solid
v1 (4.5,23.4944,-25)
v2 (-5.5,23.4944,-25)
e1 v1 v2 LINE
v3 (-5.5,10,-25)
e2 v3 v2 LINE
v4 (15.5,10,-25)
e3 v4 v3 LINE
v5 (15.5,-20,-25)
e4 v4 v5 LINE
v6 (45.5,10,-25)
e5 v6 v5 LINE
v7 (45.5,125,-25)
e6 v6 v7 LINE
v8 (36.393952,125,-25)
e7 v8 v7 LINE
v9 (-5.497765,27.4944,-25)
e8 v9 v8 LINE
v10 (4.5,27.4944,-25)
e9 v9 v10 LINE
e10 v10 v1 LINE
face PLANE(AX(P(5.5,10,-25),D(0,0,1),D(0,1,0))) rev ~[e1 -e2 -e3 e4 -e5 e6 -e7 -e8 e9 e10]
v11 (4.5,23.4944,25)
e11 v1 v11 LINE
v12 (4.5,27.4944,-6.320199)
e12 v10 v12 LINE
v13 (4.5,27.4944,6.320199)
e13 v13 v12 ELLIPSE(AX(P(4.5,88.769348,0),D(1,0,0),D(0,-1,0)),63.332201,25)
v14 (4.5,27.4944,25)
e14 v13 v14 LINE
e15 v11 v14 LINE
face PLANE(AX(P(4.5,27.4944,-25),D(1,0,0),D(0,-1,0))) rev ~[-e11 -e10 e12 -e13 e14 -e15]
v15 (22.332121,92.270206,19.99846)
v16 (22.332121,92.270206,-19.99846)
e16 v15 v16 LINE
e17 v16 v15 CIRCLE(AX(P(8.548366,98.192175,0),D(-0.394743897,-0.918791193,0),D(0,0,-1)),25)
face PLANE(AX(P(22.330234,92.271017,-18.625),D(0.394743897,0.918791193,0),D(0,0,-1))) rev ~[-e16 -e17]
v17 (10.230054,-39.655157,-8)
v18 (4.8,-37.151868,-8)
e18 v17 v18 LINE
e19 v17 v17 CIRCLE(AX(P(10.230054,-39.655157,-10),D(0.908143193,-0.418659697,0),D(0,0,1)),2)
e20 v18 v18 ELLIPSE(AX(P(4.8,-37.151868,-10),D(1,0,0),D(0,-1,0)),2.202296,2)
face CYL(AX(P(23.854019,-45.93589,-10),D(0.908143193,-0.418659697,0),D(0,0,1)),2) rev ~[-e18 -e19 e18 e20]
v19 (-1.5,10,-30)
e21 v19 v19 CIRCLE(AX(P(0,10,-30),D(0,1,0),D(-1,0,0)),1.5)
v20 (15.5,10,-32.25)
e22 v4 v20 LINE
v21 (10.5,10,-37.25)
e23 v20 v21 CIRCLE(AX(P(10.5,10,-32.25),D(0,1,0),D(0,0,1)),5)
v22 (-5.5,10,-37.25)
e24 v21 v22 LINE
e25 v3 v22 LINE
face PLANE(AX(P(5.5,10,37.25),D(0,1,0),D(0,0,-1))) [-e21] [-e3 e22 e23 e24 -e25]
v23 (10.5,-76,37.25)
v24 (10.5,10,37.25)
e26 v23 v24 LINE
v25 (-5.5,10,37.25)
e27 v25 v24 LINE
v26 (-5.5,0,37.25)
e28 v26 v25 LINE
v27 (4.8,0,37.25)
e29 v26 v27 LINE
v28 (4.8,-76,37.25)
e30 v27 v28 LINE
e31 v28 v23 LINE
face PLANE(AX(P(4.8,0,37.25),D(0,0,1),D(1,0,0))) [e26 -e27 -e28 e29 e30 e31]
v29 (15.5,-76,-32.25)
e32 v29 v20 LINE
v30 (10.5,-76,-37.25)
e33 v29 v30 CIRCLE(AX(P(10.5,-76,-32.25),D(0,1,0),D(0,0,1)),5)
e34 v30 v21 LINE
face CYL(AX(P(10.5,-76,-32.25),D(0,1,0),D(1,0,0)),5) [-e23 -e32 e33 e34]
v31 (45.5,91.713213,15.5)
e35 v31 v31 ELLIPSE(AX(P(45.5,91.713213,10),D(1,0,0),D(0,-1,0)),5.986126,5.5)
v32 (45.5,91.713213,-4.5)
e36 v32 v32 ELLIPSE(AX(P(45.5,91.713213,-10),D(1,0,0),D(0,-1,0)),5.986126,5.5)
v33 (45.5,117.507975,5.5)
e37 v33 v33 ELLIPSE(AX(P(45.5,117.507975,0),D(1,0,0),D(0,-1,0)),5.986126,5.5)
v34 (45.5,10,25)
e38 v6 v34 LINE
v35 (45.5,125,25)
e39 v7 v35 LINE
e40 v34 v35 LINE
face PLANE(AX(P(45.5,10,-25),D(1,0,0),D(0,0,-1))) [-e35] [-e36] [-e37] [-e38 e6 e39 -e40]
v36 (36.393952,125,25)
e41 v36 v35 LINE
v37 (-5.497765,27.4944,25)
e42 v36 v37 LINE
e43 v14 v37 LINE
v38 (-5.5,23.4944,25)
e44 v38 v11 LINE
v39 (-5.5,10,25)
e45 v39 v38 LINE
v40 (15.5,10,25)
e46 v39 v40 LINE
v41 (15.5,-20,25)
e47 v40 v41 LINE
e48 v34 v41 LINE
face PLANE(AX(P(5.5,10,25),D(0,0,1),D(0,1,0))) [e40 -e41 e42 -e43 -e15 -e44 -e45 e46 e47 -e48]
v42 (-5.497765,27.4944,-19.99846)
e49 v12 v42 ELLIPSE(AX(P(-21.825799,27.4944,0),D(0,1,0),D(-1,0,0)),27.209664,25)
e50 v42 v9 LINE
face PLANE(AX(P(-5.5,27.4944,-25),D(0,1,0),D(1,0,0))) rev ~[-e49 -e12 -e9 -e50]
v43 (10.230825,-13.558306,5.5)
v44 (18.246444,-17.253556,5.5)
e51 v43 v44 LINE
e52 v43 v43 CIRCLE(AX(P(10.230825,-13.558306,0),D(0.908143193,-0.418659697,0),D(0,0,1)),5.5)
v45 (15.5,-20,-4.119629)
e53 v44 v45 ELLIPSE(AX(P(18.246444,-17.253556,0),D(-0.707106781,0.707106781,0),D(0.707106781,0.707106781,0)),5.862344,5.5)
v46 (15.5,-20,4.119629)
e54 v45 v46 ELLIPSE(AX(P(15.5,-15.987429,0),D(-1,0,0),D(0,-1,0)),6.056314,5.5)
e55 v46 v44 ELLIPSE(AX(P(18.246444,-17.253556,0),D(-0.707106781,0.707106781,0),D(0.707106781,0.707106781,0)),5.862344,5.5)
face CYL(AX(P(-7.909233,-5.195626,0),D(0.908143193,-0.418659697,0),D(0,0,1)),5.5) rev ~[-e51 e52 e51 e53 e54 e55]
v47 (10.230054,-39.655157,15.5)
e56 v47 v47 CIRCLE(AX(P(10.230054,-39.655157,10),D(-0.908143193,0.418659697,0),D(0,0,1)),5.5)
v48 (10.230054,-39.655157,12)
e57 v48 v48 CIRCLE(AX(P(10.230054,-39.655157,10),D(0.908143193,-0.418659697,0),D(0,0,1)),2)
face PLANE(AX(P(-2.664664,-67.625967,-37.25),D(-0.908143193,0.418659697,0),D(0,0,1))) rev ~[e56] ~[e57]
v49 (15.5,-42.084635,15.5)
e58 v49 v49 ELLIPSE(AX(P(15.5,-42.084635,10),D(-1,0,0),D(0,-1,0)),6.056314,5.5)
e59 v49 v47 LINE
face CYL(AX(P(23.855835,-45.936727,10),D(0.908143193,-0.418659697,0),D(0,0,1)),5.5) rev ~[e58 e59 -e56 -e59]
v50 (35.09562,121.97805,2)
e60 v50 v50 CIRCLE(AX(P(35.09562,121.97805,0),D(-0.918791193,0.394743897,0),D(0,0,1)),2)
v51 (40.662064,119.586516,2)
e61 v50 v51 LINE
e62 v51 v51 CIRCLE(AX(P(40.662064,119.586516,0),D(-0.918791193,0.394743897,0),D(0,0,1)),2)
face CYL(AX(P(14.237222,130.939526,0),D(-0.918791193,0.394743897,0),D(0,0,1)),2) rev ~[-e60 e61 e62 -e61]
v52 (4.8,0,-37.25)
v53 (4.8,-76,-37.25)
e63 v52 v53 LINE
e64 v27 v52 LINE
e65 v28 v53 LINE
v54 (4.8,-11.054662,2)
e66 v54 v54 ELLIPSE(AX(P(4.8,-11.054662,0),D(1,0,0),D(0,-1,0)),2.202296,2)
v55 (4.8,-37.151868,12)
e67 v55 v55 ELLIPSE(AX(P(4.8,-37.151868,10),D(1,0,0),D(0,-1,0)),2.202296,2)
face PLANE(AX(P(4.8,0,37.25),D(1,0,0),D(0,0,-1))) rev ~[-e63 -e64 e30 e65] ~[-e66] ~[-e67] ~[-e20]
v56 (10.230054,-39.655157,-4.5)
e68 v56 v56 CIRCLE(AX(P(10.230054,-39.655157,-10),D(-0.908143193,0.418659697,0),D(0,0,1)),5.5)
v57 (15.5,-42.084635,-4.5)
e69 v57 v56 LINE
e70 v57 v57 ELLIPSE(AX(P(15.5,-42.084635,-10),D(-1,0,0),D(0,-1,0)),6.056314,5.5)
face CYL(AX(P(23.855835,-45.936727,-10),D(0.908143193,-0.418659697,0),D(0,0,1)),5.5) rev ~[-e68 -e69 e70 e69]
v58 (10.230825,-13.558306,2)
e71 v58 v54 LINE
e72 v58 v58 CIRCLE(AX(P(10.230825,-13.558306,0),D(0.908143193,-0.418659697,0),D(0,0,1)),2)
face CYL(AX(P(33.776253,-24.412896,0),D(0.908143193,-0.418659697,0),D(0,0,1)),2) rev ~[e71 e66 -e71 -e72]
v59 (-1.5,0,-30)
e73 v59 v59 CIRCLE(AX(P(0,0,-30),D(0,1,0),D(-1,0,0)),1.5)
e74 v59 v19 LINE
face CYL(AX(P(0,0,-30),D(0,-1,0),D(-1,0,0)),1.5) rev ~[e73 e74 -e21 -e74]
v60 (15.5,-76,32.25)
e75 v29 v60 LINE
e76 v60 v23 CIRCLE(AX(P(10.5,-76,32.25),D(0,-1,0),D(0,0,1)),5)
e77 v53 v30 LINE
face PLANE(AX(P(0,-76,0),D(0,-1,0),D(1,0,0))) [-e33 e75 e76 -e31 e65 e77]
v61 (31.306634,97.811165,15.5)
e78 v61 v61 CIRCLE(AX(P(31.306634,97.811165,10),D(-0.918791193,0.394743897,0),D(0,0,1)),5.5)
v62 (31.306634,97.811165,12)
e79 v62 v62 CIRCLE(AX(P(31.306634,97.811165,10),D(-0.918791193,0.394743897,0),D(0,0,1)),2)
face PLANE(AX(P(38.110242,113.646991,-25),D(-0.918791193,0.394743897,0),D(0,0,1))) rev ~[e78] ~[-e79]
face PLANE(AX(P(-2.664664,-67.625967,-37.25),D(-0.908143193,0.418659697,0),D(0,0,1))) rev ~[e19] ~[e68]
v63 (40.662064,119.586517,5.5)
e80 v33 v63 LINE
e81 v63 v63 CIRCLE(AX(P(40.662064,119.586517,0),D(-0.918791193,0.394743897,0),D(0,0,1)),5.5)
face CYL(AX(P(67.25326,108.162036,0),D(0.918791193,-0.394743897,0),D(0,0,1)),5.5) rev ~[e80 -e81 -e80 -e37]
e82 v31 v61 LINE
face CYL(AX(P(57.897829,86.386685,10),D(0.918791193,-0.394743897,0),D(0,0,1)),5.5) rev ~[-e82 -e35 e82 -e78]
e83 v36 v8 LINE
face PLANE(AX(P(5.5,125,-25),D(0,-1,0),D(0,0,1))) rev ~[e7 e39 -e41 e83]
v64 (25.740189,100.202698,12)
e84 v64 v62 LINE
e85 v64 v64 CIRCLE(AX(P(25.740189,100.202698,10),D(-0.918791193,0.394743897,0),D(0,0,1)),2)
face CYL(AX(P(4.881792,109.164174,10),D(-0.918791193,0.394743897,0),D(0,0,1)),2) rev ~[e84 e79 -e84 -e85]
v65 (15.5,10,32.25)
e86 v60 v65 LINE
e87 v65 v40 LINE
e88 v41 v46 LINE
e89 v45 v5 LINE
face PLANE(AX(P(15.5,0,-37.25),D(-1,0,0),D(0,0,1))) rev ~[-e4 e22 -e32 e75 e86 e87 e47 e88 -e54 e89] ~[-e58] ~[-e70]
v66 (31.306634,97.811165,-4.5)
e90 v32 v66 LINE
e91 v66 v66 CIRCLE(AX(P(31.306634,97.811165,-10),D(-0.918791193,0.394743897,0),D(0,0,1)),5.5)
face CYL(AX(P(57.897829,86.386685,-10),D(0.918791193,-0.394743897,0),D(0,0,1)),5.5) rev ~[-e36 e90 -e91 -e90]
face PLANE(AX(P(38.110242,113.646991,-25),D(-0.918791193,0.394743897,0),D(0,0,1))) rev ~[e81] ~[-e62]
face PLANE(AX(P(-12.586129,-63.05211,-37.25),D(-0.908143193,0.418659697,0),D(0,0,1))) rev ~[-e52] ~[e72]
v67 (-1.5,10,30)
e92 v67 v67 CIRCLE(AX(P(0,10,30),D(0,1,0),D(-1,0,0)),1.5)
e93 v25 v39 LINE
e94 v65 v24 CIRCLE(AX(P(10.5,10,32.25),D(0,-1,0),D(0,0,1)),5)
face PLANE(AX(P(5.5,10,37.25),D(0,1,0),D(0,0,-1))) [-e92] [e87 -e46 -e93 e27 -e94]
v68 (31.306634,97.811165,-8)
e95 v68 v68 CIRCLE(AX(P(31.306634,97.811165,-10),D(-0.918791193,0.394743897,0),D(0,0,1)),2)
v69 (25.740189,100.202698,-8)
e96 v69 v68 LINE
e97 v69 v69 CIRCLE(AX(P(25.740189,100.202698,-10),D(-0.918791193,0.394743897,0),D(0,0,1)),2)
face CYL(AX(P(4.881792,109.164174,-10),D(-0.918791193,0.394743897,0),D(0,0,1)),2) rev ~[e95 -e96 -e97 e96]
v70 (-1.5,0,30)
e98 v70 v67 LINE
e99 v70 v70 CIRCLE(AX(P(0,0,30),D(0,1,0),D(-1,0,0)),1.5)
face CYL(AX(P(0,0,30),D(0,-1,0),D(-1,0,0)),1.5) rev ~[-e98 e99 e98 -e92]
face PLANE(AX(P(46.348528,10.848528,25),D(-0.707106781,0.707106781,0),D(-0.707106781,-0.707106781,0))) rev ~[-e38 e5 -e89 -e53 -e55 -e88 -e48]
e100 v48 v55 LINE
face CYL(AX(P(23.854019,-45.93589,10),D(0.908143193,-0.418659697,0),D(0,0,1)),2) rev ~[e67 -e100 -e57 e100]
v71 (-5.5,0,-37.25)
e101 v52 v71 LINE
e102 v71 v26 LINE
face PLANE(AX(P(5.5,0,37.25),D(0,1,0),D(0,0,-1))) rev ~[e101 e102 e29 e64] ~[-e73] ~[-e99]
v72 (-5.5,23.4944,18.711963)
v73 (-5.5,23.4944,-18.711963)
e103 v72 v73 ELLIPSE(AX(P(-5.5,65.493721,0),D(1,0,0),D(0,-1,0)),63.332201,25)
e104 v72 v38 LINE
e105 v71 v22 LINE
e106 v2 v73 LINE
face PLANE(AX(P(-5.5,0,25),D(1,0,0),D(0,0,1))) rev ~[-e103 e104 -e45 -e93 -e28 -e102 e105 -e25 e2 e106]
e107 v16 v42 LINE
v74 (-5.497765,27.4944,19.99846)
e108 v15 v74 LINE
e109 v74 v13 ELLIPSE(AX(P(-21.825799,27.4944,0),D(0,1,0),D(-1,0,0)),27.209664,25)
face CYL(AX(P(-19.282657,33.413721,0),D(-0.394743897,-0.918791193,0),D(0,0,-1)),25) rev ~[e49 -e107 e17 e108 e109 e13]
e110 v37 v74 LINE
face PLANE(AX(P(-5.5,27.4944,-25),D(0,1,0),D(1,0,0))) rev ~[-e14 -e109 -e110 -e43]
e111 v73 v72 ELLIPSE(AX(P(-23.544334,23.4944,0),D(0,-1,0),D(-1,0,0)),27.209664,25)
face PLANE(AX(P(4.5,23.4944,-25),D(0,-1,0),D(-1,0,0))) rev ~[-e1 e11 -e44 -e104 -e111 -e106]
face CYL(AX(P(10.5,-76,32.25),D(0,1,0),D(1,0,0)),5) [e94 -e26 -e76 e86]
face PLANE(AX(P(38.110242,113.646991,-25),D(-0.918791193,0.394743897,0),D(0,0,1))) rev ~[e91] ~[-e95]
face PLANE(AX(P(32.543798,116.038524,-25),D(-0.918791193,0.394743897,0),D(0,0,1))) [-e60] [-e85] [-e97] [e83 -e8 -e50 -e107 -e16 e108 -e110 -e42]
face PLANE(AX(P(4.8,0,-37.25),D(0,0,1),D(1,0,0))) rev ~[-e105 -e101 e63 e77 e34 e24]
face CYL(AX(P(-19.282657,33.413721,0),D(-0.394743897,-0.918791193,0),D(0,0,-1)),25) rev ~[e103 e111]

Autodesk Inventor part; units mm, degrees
sketch "Sketch1" plane through (0, 0, 0) normal (0, 1, 0) x (-1, 0, 0)
  line L0 (5.5, 37.25) -> (-5.5, 37.25)
  line L1 (-5.5, 37.25) -> (-5.5, -37.25)
  line L2 (-5.5, -37.25) -> (5.5, -37.25)
  line L3 (5.5, -37.25) -> (5.5, 37.25)
  line L4 (5.5, 37.25) -> (-5.5, -37.25) construction
  line L5 (-5.5, 37.25) -> (5.5, -37.25) construction
  circle A0 centre (0, 30) radius 1.5
  line L6 (5.5, 0) -> (-5.5, 0)
  circle A1 centre (0, -30) radius 1.5
  line L7 (-5.5, -25) -> (5.5, -25)
  line L8 (5.5, -25) -> (5.5, 25)
  line L9 (5.5, 25) -> (-5.5, 25)
  line L10 (-5.5, 25) -> (-5.5, -25)
  line L11 (-5.5, -25) -> (5.5, 25) construction
  line L12 (5.5, -25) -> (-5.5, 25) construction
  point P0 (0, 0)
  dimension "d0" = 11
  dimension "d1" = 74.5
  dimension "d2" = 3
  dimension "d3" = 7.25
  dimension "d28" = 50
extrude "Extrusion1" add sketch "Sketch1" along normal blind 10
sketch "Sketch2" plane through (5.5, 0, 37.25) normal (1, 0, 0) x (0, 0, -1)
  line L0 (0, 10) -> (74.5, 10) projected
  line L1 (0, 0) -> (74.5, 0) projected
  line L2 (0, 10) -> (74.5, 10)
  line L3 (74.5, 10) -> (74.5, 0)
  line L4 (74.5, 0) -> (0, 0)
  line L5 (0, 0) -> (0, 10)
  point P0 (37.25, 0)
extrude "Extrusion2" add sketch "Sketch2" along normal blind 10
sketch "Sketch3" plane through (0, 0, 0) normal (0, -1, 0) x (1, 0, 0)
  line L0 (-5.5, 37.25) -> (15.5, 37.25) projected
  line L1 (-5.5, -37.25) -> (15.5, -37.25) projected
  line L2 (15.5, 37.25) -> (4.8, 37.25)
  line L3 (4.8, 37.25) -> (4.8, -37.25)
  line L4 (4.8, -37.25) -> (15.5, -37.25)
  line L5 (15.5, -37.25) -> (15.5, 37.25)
  point P0 (0, 0)
  dimension "d9" = 10.7
extrude "Extrusion3" add sketch "Sketch3" along normal blind 76
ref_plane "Work Plane1" through (15.5, -76, -37.25) normal (-0.9081432, 0.4186597, 0) x (0, 0, 1)
ref_plane "Work Plane3" through (10.9593, -73.9067, -37.25) normal (-0.9081432, 0.4186597, 0) x (0, 0, 1)
sketch "Sketch4" plane through (10.9593, -73.9067, -37.25) normal (-0.9081432, 0.4186597, 0) x (0, 0, 1)
  circle A0 centre (37.25, 54.5) radius 2
  circle A1 centre (37.25, 54.5) radius 5.5
  circle A2 centre (27.25, 30.8) radius 2
  circle A3 centre (27.25, 30.8) radius 5.5
  line L0 (37.25, 62.5297) -> (37.25, 0)
  line L1 (0, 0) -> (74.5, 0) projected
  circle A4 centre (47.25, 30.8) radius 5.5
  circle A5 centre (47.25, 30.8) radius 2
  point P0 (37.25, 0)
  dimension "d13" = 4
  dimension "d14" = 11
  dimension "d15" = 4
  dimension "d16" = 11
  dimension "d19" = 10
  dimension "d20" = 23.7
  dimension "d23" = 54.5
extrude "Extrusion4" cut sketch "Sketch4" along normal blind 15 contours A0 L0 | A0 L0 A1 | L0 A0 | A0 L0 A1 | A2 | A3 | A4 | A5
extrude "Extrusion11" cut sketch "Sketch4" along normal blind 25.925 contours A0 L0 | A0 L0 A1 | L0 A0 | A0 L0 A1
extrude "Extrusion6" cut sketch "Sketch4" along normal through all contours A0 L0 | L0 A0 | A2 | A5
extrude "Extrusion7" add sketch "Sketch1" along normal blind 125 contours L3 L6 L1 L9 | L3 L7 L1 L6
sketch "Sketch5" plane through (5.5, 10, -25) normal (1, 0, 0) x (0, 0, -1)
  line L0 (0, 115) -> (-50, 115) projected
  line L1 (0, 0) -> (0, 115) projected
  line L2 (-50, 115) -> (0, 115)
  line L3 (0, 115) -> (0, 0)
  line L4 (0, 0) -> (-50, 0)
  line L5 (-50, 0) -> (-50, 115)
  point P0 (-25, -10)
extrude "Extrusion8" add sketch "Sketch5" along normal blind 40
chamfer "Chamfer1" distance 40 angle 23.25 1 edges at (-5.5, 125, 0) measured on face at (-5.5, 48.3333, -8.3333)
sketch "Sketch6" plane through (11.6854, 125, -25) normal (-0.9187912, 0.3947439, 0) x (0, 0, 1)
  circle A0 centre (25, 6.4645) radius 2
  circle A1 centre (25, 6.4645) radius 5.5
  circle A2 centre (15, -17.2355) radius 5.5
  circle A3 centre (15, -17.2355) radius 2
  line L0 (25, 14.6915) -> (25, -47.8381)
  circle A4 centre (35, -17.2355) radius 5.5
  circle A5 centre (35, -17.2355) radius 2
  line L1 (0, -43.5355) -> (50, -43.5355) projected
  point P0 (25, -119.4616)
  point P1 (25, -43.5355)
  point P2 (25, -43.5355)
  dimension "d36" = 4
  dimension "d37" = 11
  dimension "d38" = 4
  dimension "d39" = 11
  dimension "d40" = 10
  dimension "d41" = 23.7
  dimension "d44" = 50
extrude "Extrusion9" cut sketch "Sketch6" against normal through all contours A0 L0 | L0 A0 | A3 | A5
chamfer "Chamfer2" distance 30 distance2 30 1 edges at (15.5, 10, 0)
sketch "Sketch8" plane through (11.6854, 125, -25) normal (-0.9187912, 0.3947439, 0) x (0, 0, 1)
  line L0 (0, 0) -> (0, 13.3481) projected
  line L1 (-12.25, -121.6327) -> (62.25, -121.6327) projected
  line L2 (0, 13.3481) -> (50, 13.3481)
  line L3 (50, 13.3481) -> (50, -121.6327)
  line L4 (50, -121.6327) -> (0, -121.6327)
  line L5 (0, -121.6327) -> (0, 13.3481)
  point P0 (25, -119.4616)
  point P1 (0, 0)
  dimension "d59" = 50
extrude "Extrusion12" cut sketch "Sketch8" against normal blind 22.7
ref_plane "Work Plane4" through (64.6996, 102.2233, -25) normal (-0.9187912, 0.3947439, 0) x (0, 0, 1)
sketch "Sketch9" plane through (64.6996, 102.2233, -25) normal (-0.9187912, 0.3947439, 0) x (0, 0, 1)
  circle A0 centre (35, -17.2355) radius 2 projected
  circle A1 centre (35, -17.2355) radius 5.5
  circle A2 centre (15, -17.2355) radius 2 projected
  circle A3 centre (15, -17.2355) radius 5.5
  circle A4 centre (25, 6.4645) radius 2 projected
  circle A5 centre (25, 6.4645) radius 5.5
  point P0 (25, -119.4616)
  dimension "d63" = 11
  dimension "d64" = 11
  dimension "d65" = 11
extrude "Extrusion13" cut sketch "Sketch9" along normal blind 28.9375 contours A0 | A1 | A2 | A3 | A4 | A5
ref_plane "Work Plane5" through (32.5419, 116.0393, -25) normal (-0.9187912, 0.3947439, 0) x (0, 0, 1)
ref_plane "Work Plane6" through (-5.5, 27.4944, -18.625) normal (0.3947439, 0.9187912, 0) x (0, 0, -1)
sketch "Sketch10" plane through (-5.5, 27.4944, -18.625) normal (0.3947439, 0.9187912, 0) x (0, 0, -1)
  circle A0 centre (-18.625, 15) radius 25
  line L0 (-43.625, 0) -> (6.375, 0) projected
  point P0 (-18.625, -15.9066)
  point P1 (-38.625, 0)
  point P2 (1.375, 0)
  dimension "d70" = 50
  dimension "d71" = 15
extrude "Extrusion14" cut sketch "Sketch10" along normal blind 70.5 and the other way blind 54.3375
sketch "Sketch11" plane through (15.5, 10, -25) normal (0, 0, -1) x (-1, 0, 0)
  line L0 (21, 17.4944) -> (-6.8294, 82.2691) projected
  line L1 (21, 17.4944) -> (11, 17.4944)
  line L2 (11, 17.4944) -> (11, 13.4944)
  line L3 (11, 13.4944) -> (21, 13.4944)
  line L4 (21, 13.4944) -> (21, 17.4944)
  point P0 (15.5, -10)
  dimension "d76" = 10
  dimension "d77" = 4
extrude "Extrusion15" cut sketch "Sketch11" against normal blind 70.5
fillet "Fillet1" radius 5 2 edges at (15.5, -33, 37.25) (15.5, -33, -37.25)
properties part number "Camera Bracket"
